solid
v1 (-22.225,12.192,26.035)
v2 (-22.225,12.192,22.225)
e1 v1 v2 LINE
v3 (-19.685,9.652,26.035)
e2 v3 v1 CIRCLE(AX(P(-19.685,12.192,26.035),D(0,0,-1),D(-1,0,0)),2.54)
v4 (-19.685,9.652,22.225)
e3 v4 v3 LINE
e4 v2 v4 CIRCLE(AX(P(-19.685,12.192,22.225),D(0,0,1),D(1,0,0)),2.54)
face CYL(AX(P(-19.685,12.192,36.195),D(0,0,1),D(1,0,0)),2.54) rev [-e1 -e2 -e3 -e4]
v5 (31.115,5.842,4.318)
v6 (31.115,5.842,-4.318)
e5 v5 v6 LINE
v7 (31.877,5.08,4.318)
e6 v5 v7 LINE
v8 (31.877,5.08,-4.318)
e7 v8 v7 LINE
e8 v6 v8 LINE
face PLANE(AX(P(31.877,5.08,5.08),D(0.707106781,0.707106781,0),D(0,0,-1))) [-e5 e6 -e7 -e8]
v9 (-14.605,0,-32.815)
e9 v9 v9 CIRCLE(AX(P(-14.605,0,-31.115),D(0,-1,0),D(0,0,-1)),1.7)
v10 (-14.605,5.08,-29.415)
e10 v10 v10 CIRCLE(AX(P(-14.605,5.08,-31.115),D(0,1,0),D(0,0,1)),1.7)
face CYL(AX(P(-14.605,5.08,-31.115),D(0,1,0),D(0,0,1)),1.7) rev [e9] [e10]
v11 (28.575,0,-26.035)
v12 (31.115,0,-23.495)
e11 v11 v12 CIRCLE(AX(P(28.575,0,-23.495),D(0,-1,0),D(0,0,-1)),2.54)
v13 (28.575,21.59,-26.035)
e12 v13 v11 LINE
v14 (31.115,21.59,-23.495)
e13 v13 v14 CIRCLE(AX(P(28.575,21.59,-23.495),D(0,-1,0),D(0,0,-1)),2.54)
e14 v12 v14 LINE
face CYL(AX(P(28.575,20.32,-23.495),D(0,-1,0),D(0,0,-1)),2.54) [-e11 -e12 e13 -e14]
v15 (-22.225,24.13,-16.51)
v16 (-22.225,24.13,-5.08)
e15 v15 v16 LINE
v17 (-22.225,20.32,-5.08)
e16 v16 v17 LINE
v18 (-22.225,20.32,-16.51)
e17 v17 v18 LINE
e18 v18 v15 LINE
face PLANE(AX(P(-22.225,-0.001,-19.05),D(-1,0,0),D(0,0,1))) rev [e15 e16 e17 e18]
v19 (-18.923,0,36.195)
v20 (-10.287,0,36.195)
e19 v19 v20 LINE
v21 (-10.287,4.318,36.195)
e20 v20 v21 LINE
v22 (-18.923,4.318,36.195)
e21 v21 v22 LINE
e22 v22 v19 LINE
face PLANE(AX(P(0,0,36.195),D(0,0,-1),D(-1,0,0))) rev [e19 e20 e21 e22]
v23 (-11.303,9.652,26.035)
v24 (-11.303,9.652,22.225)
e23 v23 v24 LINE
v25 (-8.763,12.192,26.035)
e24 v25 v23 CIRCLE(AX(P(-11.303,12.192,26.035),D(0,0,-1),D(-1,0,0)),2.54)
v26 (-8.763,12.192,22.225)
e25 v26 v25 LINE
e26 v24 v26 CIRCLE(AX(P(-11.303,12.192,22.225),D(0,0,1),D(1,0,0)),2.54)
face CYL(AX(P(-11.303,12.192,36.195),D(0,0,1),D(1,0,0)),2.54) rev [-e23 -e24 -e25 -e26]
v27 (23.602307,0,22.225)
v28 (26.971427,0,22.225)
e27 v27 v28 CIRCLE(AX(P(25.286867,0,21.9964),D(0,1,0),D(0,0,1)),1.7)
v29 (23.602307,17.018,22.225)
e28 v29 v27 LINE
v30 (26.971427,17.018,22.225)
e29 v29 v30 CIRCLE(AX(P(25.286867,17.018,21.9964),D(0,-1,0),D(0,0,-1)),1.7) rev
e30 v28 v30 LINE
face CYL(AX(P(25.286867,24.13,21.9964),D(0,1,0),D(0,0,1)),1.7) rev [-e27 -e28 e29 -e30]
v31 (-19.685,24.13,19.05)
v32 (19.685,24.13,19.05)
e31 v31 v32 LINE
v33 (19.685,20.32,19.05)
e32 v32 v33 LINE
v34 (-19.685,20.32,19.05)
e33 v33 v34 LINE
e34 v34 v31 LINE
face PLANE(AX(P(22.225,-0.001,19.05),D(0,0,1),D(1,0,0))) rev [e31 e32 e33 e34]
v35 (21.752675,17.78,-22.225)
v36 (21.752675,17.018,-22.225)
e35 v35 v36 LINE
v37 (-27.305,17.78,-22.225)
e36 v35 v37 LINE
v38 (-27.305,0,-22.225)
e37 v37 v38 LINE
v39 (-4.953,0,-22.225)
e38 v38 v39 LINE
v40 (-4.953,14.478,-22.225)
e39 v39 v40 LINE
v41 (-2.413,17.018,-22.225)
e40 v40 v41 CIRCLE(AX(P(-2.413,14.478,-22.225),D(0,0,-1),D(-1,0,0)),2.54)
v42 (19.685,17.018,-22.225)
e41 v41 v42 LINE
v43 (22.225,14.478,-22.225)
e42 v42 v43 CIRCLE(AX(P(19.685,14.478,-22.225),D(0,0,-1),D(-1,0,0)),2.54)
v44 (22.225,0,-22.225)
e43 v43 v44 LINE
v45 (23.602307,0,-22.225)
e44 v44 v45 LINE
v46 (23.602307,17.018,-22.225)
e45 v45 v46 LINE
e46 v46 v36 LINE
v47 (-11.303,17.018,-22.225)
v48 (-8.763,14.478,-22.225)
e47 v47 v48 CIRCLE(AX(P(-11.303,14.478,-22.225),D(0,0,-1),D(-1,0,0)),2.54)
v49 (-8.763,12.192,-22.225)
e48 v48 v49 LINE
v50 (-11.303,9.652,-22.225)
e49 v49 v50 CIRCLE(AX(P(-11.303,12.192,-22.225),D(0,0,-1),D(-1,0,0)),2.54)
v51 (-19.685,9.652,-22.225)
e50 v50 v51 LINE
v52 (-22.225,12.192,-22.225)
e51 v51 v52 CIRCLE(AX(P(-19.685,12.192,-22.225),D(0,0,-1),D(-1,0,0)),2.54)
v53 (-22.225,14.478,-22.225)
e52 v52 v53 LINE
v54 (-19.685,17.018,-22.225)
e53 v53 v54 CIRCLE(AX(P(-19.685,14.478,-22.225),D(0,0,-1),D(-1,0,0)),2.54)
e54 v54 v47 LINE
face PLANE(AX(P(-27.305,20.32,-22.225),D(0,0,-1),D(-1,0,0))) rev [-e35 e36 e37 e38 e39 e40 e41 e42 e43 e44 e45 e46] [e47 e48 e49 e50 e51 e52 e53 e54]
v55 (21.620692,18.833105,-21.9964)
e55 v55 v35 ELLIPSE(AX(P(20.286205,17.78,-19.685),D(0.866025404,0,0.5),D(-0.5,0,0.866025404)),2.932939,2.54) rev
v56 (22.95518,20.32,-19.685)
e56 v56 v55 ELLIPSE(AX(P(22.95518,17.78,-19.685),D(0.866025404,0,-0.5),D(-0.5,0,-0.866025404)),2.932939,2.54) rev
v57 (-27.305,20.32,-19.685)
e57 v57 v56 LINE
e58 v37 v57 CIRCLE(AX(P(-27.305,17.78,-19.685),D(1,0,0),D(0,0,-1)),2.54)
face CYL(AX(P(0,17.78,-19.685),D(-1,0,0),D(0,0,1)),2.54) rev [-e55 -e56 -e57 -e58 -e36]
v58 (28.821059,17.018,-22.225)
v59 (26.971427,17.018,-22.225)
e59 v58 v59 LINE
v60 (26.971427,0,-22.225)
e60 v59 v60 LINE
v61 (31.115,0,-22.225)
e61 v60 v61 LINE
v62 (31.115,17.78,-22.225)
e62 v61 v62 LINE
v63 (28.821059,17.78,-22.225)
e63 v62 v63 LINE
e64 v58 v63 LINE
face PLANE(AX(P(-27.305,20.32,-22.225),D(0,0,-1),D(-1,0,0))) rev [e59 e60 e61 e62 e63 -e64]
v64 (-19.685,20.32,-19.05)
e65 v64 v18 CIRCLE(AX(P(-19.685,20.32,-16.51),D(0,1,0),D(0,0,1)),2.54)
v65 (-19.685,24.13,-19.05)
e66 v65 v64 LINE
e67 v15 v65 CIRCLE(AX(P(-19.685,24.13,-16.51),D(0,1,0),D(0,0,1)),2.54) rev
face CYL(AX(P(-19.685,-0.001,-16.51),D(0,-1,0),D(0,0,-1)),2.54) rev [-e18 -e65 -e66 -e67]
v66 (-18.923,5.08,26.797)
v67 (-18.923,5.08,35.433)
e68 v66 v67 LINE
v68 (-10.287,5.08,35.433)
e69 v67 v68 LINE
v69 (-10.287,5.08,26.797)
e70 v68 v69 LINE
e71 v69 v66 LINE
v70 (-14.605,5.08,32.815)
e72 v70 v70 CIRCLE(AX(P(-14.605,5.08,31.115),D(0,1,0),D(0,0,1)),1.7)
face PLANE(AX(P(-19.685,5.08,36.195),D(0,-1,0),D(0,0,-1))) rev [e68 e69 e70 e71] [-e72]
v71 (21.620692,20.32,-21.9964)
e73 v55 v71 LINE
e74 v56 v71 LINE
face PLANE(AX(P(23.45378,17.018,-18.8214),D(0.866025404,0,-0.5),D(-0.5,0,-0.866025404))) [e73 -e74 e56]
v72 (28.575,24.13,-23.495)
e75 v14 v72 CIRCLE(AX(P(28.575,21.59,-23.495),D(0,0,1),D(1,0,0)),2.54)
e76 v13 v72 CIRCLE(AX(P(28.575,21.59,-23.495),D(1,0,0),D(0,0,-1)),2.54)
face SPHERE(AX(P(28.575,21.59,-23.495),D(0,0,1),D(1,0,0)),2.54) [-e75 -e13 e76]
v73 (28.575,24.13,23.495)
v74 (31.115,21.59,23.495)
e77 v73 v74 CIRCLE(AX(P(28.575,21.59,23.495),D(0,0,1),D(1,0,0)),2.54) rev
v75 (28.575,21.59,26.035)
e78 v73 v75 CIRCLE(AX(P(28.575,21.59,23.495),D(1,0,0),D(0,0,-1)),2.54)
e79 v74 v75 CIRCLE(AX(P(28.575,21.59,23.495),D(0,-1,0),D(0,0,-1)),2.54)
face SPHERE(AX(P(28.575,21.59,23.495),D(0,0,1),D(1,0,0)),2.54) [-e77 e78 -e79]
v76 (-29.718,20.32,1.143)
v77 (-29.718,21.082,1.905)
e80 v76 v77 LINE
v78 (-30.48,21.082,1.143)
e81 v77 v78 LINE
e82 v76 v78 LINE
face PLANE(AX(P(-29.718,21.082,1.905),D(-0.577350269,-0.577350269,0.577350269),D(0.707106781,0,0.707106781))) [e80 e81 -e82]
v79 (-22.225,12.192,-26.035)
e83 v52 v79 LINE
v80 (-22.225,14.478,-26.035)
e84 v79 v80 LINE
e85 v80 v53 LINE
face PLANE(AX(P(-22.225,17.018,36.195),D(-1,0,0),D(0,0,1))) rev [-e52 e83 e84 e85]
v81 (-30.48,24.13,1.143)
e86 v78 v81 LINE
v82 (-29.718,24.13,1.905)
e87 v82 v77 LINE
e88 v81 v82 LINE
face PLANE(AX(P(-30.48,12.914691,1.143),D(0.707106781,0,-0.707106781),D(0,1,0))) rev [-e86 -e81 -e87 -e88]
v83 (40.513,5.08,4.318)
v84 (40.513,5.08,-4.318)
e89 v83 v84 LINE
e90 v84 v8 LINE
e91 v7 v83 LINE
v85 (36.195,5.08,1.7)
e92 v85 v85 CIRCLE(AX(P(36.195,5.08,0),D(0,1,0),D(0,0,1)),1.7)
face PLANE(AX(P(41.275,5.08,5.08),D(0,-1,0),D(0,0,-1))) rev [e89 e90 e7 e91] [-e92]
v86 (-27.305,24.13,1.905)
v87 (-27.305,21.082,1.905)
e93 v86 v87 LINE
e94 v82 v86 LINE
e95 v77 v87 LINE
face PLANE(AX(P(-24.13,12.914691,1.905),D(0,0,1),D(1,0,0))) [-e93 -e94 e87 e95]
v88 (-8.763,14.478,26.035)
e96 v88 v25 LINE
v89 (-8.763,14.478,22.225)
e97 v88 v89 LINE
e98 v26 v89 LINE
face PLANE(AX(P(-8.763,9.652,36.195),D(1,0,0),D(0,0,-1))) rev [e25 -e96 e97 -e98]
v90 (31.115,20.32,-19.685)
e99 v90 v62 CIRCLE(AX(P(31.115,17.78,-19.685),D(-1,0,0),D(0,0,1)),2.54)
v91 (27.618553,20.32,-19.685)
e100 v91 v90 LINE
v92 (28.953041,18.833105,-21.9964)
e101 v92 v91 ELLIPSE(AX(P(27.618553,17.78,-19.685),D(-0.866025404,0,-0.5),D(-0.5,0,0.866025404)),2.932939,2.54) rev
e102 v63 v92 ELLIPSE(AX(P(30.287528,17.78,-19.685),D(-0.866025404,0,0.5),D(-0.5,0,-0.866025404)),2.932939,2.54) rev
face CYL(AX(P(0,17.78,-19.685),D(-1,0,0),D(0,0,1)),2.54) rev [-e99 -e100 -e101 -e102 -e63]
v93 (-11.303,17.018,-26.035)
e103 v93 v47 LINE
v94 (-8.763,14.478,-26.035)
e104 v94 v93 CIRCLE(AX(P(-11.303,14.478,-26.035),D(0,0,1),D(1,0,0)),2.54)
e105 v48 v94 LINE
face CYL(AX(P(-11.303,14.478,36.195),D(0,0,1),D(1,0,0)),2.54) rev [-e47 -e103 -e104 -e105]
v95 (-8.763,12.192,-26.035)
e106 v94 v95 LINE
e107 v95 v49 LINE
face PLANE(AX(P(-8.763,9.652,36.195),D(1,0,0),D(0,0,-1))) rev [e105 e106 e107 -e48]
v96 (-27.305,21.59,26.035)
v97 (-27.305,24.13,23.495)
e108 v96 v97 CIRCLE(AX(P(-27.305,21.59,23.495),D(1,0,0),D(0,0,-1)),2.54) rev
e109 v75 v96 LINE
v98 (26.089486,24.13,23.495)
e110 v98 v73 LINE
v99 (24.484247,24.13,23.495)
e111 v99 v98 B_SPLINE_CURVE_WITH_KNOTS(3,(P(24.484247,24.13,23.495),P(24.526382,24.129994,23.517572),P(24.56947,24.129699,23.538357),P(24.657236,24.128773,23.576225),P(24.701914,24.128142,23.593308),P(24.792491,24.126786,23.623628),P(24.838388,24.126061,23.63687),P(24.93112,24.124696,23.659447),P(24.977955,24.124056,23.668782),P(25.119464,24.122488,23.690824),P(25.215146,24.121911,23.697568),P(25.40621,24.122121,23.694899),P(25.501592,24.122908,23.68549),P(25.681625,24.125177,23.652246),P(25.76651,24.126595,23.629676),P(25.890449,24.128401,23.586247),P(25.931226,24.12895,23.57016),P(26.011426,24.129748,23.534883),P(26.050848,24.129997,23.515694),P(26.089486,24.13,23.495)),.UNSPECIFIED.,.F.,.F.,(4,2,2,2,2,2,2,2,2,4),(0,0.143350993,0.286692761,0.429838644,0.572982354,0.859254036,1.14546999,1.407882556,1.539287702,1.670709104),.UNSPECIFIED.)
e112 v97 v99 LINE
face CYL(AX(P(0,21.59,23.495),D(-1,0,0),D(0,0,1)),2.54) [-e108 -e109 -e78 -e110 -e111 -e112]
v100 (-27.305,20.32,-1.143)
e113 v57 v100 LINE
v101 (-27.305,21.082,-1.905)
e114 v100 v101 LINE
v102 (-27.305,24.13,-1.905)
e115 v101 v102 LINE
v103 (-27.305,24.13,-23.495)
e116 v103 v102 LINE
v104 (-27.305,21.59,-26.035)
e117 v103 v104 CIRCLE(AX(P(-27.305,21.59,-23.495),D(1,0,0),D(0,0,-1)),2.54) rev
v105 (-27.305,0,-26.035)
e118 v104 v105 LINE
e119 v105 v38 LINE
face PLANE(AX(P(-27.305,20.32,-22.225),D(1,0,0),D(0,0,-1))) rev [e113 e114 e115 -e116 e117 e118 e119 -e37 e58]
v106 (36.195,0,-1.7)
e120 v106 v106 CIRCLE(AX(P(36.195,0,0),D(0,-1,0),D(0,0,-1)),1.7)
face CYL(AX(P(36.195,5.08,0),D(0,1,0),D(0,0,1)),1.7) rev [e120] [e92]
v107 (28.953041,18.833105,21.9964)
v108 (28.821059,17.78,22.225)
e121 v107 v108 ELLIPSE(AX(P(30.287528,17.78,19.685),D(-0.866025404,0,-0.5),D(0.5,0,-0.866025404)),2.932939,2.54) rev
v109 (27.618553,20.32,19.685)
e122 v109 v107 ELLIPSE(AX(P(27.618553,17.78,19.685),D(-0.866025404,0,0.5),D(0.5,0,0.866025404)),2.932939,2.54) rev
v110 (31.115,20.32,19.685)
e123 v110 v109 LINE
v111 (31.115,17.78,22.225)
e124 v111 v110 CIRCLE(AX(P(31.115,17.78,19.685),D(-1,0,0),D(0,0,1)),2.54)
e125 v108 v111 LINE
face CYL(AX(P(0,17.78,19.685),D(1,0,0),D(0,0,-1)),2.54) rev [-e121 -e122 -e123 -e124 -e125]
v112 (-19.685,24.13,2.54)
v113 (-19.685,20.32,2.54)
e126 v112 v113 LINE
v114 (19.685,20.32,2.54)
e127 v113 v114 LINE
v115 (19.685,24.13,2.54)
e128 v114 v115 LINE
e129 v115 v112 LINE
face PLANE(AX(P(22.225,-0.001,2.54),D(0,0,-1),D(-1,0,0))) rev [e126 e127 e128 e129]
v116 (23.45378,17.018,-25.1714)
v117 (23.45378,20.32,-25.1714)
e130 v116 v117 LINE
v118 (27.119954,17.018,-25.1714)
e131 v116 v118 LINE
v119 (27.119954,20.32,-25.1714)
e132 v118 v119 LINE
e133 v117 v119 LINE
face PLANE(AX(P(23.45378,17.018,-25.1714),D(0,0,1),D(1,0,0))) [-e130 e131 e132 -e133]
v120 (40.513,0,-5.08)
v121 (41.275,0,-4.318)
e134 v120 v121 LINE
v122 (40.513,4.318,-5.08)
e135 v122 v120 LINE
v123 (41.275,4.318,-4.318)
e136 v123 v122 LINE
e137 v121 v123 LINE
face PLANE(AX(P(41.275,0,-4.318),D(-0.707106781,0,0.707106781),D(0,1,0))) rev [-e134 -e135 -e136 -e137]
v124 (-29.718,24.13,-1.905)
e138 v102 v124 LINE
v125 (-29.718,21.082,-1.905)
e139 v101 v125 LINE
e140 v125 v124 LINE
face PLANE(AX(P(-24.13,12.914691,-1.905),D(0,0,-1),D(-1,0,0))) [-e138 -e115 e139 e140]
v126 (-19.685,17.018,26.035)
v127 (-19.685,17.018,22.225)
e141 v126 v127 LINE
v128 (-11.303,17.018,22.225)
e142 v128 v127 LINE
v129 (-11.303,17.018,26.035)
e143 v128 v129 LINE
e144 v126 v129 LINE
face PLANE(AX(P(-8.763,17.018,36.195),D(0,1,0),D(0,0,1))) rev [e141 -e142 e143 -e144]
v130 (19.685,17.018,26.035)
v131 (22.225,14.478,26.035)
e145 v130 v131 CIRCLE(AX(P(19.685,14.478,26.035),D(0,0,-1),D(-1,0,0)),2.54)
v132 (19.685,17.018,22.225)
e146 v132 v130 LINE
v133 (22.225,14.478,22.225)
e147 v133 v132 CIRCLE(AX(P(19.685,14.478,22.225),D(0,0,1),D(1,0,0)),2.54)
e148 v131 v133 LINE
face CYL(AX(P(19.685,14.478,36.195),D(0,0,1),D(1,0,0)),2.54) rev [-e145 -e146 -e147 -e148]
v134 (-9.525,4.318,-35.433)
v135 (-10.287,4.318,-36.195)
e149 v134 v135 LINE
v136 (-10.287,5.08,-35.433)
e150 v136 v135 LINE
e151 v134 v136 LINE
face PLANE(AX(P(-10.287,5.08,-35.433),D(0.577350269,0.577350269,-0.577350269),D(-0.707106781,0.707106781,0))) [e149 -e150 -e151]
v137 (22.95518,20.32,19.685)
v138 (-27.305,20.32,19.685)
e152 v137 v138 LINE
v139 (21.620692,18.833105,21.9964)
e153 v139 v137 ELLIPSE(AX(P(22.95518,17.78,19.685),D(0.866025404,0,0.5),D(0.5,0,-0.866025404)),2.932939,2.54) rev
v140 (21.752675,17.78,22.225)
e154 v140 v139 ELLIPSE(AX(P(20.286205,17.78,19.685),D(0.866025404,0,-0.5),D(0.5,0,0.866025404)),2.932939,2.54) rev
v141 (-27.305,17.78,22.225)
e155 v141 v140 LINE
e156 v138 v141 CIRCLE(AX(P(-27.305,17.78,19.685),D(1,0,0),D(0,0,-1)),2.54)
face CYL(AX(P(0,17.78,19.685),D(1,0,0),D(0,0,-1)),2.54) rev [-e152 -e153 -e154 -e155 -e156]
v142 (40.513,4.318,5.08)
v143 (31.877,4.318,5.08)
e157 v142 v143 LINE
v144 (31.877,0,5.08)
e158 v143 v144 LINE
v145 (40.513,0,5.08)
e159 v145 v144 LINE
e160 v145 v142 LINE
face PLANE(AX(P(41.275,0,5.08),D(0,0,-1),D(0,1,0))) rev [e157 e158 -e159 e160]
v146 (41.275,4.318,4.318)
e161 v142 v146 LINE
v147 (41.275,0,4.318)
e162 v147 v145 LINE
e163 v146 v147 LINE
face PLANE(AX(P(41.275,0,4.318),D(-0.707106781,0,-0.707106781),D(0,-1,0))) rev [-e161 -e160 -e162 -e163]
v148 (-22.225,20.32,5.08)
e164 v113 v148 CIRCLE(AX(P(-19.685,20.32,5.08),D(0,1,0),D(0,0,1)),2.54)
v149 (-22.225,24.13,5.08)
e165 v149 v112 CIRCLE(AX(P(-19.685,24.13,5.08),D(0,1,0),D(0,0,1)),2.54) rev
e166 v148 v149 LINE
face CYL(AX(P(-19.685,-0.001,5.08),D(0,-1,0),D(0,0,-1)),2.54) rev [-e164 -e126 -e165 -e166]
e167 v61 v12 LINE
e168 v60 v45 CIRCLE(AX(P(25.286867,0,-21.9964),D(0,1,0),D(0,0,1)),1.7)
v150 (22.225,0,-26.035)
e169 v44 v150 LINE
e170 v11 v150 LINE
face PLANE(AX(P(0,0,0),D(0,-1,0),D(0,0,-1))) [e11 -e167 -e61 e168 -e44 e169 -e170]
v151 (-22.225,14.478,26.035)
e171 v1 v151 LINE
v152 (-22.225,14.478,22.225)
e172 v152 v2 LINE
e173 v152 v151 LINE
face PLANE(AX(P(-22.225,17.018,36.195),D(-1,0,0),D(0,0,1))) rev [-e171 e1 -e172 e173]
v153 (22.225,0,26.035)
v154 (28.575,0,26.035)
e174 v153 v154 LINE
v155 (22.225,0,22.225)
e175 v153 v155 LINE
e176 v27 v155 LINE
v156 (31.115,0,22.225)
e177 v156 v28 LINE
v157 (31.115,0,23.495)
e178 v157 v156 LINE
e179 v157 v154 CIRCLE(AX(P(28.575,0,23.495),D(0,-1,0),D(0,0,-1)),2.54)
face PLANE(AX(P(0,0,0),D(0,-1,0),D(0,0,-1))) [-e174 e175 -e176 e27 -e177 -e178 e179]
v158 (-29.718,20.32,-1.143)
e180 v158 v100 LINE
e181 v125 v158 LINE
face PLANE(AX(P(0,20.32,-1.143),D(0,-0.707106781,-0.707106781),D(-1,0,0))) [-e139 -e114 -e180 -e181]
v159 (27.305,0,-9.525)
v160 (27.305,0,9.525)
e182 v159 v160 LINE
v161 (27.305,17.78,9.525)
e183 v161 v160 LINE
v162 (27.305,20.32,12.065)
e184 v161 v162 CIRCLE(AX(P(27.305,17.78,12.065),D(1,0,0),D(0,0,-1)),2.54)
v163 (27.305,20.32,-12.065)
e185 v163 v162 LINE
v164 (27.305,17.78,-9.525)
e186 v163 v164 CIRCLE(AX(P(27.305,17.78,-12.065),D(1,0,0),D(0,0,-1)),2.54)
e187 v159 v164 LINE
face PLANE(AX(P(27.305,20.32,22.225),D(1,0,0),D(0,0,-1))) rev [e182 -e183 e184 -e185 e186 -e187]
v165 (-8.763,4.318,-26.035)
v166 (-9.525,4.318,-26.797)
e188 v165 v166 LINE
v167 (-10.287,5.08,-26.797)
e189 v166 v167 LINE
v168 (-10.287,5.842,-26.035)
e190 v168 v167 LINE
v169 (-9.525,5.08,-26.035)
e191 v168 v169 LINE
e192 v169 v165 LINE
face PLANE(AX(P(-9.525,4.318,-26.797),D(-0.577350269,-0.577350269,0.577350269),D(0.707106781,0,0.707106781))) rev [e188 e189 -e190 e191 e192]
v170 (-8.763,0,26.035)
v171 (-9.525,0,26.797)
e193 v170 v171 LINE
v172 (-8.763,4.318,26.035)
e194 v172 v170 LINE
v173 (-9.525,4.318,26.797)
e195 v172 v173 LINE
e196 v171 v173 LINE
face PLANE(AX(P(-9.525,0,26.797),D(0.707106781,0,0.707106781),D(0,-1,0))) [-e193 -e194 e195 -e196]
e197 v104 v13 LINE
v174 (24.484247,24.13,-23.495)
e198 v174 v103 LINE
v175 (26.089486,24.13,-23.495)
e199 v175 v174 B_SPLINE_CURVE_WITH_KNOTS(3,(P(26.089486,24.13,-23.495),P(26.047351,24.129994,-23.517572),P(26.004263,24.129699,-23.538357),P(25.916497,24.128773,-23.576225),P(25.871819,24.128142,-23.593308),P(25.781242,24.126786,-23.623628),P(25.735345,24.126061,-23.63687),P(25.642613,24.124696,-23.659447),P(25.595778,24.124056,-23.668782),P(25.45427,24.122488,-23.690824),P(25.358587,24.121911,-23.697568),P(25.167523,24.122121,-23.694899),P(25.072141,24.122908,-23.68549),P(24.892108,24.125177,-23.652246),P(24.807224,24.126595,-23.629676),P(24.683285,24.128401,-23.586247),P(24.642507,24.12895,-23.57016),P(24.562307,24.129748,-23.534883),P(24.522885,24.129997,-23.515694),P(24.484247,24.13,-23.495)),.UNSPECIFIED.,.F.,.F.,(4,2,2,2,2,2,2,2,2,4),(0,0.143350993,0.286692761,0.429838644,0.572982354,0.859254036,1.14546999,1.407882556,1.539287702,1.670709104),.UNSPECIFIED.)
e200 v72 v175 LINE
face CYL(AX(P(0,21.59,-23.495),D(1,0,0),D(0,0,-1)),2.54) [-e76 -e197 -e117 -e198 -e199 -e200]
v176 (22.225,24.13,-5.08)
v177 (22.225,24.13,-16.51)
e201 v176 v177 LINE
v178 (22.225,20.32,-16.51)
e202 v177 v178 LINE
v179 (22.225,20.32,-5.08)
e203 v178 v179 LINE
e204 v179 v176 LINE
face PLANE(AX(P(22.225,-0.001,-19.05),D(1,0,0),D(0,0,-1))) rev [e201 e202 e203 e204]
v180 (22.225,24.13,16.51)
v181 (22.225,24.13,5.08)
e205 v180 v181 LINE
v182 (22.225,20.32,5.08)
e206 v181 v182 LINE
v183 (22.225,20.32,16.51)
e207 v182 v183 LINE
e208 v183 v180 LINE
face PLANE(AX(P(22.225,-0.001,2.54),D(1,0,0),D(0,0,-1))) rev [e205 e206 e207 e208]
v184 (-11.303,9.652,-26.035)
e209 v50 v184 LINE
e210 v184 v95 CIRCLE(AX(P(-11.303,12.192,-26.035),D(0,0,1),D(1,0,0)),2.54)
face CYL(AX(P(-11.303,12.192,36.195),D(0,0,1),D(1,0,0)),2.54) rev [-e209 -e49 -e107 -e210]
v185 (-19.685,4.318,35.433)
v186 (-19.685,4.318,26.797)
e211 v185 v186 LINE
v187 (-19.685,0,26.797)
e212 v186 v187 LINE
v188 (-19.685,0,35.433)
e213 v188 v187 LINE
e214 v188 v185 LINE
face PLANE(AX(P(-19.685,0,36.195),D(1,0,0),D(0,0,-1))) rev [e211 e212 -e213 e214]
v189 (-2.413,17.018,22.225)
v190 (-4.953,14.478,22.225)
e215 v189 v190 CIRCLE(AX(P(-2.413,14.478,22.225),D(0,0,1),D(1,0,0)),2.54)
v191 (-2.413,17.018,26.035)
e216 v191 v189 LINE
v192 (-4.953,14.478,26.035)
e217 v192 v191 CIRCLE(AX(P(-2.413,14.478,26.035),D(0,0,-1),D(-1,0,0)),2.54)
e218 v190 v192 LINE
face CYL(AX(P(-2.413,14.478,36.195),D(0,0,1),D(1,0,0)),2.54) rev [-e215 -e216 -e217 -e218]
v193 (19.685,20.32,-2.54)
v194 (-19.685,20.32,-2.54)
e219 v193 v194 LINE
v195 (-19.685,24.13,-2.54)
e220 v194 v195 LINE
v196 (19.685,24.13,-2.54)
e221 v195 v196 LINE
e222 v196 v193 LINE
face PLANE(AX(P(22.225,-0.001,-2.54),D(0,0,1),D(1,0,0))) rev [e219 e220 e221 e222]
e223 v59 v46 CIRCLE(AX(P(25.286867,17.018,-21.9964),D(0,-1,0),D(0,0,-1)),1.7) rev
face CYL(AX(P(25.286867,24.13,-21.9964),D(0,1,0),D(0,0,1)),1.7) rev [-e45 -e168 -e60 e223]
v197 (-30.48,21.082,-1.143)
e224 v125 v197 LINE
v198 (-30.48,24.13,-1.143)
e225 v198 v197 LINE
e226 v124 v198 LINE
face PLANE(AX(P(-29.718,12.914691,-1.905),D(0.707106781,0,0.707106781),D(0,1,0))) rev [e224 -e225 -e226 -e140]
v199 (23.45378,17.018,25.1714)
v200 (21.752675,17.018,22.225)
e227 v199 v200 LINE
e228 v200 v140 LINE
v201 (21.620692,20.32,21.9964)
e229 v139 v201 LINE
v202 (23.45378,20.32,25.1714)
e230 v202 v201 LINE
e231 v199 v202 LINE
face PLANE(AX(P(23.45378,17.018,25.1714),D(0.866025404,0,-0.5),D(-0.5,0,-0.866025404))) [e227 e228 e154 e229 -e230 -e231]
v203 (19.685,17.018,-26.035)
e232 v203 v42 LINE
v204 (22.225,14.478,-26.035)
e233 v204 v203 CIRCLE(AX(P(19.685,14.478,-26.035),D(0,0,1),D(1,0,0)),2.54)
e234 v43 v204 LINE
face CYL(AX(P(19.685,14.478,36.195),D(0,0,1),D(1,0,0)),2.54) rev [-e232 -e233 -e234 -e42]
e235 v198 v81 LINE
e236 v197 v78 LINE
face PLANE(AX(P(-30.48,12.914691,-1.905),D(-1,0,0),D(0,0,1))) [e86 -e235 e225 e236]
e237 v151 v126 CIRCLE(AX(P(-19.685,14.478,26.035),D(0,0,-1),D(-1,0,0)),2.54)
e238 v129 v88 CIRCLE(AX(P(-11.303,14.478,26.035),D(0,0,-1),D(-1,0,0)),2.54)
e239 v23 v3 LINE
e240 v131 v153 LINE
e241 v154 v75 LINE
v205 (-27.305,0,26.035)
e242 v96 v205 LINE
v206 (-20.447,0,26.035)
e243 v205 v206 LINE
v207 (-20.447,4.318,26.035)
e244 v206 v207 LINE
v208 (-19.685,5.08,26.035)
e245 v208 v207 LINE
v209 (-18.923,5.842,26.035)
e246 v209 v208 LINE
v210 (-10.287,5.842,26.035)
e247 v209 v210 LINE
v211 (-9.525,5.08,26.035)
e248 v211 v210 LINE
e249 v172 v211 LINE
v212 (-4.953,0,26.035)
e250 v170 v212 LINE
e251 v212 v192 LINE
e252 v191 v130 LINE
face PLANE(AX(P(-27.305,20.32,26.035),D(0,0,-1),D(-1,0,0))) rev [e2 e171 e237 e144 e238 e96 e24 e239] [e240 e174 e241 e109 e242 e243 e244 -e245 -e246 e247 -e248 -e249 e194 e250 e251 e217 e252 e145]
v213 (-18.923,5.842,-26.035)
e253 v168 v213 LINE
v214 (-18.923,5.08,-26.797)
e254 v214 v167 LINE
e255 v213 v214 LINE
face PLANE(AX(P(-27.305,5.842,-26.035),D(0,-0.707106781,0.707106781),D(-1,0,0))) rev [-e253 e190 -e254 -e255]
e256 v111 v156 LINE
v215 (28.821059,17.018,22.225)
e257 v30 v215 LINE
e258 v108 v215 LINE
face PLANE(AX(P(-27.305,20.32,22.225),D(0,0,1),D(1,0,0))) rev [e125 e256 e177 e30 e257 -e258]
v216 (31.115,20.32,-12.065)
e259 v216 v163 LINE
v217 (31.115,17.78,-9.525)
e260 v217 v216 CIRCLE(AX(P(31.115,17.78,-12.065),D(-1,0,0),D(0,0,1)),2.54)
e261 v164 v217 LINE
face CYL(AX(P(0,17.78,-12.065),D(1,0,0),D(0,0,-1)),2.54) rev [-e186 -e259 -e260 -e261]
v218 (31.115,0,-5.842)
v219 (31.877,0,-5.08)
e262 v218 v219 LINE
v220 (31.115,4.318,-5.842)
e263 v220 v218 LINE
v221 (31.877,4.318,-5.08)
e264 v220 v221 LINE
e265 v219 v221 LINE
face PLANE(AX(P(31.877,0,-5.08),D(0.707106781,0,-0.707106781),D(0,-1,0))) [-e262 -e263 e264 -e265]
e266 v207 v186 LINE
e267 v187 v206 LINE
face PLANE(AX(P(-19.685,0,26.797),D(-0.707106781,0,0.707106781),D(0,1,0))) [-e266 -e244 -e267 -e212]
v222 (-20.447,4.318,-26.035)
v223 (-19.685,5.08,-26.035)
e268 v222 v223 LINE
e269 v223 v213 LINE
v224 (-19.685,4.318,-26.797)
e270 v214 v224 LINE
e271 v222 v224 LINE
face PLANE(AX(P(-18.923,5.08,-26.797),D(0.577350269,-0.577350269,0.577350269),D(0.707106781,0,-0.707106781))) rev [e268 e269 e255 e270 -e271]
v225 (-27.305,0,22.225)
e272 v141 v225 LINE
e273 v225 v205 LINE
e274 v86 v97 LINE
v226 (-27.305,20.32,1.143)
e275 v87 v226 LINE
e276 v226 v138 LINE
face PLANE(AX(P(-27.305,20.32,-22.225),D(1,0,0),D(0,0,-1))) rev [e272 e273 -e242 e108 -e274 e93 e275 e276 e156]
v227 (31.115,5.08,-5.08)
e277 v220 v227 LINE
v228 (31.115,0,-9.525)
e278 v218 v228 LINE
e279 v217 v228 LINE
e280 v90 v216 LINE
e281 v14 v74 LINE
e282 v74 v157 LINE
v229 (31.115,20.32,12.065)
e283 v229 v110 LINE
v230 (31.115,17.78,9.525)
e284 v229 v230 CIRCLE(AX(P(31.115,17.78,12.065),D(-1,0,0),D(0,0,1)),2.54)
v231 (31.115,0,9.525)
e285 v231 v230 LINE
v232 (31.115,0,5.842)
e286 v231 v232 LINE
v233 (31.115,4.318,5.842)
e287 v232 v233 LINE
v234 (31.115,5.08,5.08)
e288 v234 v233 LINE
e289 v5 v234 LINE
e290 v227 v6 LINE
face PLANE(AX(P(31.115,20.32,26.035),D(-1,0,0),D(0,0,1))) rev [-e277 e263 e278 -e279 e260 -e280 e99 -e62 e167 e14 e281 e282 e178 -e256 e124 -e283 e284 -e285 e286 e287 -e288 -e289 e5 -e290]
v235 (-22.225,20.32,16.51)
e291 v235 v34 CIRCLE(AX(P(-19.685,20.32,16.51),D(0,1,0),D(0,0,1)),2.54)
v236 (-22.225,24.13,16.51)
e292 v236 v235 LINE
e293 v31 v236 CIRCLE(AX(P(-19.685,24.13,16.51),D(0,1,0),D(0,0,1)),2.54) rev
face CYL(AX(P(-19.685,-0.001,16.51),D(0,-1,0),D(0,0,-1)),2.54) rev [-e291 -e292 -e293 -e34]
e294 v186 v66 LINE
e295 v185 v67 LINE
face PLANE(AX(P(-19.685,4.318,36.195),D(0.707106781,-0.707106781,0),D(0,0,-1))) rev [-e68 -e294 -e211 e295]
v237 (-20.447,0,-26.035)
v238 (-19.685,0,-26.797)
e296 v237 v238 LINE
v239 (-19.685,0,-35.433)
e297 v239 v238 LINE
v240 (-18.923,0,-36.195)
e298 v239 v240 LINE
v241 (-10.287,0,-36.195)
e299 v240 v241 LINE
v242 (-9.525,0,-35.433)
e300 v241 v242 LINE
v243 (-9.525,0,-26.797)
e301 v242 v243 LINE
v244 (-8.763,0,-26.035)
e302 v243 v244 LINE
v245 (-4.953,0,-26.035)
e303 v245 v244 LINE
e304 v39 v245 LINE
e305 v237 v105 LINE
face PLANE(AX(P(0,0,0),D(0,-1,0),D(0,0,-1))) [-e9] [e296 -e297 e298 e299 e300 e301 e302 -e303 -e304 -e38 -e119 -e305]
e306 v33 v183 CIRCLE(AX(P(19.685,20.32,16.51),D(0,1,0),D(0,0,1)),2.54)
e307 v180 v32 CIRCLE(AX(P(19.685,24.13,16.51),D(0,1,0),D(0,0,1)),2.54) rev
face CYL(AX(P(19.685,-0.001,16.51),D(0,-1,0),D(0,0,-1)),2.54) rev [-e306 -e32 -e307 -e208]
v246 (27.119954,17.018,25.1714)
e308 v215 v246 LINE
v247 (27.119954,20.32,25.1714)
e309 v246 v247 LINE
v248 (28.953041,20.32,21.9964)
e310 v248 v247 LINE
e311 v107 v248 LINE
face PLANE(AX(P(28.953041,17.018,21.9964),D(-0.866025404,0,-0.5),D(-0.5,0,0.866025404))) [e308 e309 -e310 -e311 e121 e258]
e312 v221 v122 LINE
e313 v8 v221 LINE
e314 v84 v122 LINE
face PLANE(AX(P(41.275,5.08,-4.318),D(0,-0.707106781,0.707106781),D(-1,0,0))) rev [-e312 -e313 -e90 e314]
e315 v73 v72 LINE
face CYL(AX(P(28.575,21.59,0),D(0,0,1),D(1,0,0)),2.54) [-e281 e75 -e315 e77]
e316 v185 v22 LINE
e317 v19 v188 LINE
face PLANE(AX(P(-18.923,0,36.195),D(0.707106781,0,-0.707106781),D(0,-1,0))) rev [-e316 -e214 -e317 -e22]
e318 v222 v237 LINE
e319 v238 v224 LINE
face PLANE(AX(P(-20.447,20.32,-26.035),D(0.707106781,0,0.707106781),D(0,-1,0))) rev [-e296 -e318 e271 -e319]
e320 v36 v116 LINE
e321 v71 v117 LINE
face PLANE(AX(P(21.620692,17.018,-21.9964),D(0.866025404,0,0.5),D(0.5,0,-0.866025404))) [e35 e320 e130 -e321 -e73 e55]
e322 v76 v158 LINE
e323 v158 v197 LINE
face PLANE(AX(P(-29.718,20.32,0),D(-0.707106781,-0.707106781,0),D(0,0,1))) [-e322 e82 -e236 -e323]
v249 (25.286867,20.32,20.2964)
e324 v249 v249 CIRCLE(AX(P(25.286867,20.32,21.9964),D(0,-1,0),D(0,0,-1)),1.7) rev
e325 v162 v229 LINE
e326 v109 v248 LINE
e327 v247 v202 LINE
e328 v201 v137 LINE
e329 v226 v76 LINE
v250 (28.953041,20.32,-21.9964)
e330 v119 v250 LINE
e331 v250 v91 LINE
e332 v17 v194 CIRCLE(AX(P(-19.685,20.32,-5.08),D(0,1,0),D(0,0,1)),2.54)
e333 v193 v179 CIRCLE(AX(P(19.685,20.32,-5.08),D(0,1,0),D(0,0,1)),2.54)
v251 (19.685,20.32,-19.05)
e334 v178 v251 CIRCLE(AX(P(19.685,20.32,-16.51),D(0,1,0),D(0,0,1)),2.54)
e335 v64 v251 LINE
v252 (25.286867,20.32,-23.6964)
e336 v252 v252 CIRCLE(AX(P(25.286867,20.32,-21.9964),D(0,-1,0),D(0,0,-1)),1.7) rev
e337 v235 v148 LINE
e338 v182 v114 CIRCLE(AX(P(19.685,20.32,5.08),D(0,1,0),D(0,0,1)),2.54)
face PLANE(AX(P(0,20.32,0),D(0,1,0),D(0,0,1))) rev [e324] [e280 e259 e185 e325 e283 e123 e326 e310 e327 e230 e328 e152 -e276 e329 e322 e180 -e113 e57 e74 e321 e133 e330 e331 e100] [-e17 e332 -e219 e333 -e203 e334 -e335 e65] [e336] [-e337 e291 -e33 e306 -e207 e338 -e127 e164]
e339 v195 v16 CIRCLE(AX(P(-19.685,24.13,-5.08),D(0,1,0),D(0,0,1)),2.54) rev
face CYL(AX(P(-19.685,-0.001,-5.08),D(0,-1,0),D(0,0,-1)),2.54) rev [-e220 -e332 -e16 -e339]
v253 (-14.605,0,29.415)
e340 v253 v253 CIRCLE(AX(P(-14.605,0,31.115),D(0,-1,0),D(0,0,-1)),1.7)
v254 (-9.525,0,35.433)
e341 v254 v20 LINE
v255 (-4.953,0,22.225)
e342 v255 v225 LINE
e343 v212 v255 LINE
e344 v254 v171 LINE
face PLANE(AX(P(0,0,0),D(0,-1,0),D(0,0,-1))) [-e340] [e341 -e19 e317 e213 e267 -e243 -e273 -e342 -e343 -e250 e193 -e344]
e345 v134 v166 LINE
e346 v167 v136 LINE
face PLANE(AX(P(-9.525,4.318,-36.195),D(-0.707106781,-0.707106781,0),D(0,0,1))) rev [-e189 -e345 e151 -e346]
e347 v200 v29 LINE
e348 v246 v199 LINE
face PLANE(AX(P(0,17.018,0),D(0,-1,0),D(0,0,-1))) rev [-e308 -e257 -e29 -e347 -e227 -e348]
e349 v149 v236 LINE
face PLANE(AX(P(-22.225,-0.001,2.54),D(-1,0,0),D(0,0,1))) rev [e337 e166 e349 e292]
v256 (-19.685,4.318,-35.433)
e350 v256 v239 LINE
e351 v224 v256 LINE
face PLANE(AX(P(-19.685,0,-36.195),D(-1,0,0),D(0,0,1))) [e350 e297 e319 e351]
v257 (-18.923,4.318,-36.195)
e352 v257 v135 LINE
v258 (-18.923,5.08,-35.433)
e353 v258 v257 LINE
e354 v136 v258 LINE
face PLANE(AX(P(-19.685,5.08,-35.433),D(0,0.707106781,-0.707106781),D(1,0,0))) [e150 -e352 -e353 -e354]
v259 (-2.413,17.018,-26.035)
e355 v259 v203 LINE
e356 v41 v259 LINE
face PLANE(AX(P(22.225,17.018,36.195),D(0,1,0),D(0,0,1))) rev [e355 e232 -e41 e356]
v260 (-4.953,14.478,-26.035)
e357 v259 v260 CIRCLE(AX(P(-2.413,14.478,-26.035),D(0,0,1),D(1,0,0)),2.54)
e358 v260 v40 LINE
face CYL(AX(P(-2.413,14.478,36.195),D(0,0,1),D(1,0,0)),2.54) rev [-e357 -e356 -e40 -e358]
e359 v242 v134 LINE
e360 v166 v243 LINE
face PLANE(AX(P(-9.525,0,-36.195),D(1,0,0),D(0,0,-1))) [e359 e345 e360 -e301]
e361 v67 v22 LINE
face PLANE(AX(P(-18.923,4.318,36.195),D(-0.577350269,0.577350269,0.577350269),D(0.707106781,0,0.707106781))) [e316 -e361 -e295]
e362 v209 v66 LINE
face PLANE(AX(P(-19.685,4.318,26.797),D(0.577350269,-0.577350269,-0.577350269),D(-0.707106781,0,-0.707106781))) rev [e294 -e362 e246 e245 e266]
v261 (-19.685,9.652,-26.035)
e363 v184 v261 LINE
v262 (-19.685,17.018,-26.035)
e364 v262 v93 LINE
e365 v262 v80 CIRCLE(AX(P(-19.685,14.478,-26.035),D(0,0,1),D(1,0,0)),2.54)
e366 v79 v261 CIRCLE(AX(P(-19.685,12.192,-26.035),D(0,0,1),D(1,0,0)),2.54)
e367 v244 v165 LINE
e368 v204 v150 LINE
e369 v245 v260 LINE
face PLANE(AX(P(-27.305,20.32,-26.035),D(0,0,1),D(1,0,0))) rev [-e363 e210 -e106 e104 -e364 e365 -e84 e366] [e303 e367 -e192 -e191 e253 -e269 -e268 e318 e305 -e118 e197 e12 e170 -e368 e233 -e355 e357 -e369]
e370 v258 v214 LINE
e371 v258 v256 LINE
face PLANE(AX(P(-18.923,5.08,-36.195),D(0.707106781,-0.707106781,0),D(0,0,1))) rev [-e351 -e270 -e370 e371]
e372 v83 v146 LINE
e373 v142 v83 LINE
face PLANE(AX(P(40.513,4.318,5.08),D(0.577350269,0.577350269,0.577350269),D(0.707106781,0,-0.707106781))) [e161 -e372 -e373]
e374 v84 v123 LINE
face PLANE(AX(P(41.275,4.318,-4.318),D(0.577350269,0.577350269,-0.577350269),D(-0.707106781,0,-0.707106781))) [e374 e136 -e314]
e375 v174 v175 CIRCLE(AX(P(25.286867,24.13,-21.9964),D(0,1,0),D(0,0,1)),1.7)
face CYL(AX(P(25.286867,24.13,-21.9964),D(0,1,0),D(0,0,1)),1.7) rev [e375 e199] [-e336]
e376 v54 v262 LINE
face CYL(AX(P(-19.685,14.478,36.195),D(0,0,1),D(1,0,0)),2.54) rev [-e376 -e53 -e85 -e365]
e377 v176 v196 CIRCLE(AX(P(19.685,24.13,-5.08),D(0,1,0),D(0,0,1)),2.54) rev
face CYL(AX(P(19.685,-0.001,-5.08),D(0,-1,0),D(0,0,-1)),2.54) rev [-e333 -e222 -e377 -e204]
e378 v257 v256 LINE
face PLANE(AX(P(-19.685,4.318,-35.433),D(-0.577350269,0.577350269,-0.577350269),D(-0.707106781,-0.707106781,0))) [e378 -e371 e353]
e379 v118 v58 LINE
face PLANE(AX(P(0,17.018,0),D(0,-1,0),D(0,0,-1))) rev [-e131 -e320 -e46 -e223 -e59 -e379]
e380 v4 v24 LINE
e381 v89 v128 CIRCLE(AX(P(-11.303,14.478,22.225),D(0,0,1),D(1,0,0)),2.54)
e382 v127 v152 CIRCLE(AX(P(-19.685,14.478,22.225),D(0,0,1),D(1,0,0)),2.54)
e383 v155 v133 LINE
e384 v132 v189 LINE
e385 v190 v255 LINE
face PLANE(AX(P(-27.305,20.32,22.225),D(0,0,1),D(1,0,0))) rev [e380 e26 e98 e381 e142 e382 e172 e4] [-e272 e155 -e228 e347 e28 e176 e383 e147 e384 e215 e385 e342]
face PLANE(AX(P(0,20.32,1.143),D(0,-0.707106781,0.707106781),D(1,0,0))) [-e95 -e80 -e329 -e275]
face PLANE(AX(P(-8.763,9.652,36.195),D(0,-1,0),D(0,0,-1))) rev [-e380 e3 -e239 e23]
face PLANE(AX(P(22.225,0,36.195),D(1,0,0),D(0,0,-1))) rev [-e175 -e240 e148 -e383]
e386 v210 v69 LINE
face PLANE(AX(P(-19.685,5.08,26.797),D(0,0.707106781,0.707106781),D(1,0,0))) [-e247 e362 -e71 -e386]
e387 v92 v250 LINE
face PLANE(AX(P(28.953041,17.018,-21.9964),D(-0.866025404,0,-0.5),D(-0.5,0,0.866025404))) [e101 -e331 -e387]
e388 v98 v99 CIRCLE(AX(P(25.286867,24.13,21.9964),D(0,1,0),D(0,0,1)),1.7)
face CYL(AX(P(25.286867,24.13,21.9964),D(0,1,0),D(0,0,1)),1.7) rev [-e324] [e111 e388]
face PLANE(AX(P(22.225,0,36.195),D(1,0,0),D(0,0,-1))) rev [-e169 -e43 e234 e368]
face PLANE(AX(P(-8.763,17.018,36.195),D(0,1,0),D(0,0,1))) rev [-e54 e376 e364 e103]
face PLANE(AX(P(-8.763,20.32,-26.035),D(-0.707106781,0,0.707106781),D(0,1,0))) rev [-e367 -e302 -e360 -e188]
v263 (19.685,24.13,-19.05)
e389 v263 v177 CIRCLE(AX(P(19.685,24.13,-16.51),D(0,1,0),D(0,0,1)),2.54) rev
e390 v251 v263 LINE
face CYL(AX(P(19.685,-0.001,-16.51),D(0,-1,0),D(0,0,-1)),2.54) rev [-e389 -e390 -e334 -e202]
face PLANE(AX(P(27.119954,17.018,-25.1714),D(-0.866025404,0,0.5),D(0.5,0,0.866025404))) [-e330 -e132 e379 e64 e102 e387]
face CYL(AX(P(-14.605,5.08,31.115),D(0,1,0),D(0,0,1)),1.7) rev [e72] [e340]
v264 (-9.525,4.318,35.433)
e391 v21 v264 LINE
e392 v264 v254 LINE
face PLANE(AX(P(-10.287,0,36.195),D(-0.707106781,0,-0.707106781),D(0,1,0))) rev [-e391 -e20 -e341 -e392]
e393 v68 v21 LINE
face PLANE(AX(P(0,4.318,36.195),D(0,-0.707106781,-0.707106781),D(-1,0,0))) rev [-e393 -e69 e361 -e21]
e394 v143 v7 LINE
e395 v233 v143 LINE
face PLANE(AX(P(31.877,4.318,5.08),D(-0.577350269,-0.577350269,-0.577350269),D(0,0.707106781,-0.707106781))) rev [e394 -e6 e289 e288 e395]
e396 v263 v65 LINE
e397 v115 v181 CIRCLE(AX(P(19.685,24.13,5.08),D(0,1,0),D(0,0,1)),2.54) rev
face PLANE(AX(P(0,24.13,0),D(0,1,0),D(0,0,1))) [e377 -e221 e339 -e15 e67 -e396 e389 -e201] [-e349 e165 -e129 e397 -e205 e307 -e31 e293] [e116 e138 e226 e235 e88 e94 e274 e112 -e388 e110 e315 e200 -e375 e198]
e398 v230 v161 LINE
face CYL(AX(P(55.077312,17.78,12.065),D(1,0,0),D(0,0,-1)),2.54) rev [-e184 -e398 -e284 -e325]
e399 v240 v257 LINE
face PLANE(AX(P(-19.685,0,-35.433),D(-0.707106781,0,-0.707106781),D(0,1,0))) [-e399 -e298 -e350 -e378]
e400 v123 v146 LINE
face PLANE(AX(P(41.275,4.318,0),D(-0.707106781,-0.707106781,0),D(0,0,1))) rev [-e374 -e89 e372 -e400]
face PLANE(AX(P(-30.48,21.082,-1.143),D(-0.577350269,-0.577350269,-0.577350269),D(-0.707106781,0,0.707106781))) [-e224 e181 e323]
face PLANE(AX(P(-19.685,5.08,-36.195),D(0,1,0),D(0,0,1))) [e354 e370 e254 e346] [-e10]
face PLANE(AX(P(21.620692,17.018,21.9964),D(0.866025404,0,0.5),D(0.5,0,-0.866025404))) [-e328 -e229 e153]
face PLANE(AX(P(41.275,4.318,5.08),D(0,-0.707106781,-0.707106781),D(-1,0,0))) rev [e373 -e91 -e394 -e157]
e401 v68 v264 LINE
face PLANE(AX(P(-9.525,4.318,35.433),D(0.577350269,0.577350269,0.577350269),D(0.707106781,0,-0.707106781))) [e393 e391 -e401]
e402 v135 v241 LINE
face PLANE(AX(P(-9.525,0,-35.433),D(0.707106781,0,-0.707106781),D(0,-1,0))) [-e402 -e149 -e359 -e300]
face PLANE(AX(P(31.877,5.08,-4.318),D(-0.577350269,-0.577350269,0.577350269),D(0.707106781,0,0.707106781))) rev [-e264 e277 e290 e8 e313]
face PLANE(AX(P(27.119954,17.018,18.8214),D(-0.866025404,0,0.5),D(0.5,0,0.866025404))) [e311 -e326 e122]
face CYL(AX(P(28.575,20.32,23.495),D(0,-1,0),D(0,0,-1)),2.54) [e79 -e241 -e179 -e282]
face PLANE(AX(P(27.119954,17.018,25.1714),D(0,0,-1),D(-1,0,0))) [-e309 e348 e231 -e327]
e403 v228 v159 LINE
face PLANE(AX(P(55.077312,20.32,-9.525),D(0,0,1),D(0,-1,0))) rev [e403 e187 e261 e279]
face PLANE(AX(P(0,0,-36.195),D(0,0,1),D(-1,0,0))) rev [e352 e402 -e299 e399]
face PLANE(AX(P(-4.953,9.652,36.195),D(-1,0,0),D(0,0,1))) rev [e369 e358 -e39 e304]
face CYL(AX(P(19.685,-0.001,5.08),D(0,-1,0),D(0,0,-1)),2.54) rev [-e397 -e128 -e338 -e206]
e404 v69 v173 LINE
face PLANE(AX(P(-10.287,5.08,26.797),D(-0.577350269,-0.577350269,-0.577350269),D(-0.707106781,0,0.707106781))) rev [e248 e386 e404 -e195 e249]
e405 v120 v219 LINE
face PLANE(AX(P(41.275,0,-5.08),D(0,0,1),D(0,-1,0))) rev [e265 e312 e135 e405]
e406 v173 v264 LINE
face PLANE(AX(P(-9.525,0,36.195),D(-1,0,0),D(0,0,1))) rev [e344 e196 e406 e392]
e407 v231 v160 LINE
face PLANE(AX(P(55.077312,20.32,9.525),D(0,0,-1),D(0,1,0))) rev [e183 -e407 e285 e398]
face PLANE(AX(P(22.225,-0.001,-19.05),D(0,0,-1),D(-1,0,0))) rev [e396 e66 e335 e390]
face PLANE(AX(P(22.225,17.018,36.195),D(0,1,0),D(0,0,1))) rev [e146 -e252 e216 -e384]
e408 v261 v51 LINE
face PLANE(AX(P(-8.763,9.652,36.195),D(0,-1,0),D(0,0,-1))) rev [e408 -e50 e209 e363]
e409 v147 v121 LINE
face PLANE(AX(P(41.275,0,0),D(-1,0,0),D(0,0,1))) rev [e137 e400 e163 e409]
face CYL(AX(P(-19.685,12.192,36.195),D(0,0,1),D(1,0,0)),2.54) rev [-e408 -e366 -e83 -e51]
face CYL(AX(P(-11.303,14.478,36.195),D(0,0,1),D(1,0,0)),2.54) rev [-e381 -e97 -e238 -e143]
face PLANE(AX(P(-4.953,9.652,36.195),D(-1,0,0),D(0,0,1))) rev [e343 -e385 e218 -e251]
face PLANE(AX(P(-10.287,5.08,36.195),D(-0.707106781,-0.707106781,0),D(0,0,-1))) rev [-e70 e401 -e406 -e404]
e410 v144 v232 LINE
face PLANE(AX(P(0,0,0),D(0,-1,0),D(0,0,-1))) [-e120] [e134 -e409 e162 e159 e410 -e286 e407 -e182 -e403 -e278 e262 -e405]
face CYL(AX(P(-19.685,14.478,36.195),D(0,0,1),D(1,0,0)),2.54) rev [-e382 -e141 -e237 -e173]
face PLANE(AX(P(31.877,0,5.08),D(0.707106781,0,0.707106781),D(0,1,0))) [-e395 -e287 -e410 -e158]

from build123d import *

# Parameters (mm, degrees)
BOSS_EXTRUDE1_DEPTH      = 20.32
SKETCH2_W                = 58.42
SKETCH2_H                = 52.07
BOSS_EXTRUDE2_DEPTH      = 3.81
SKETCH3_W                = 12.7
SKETCH3_H                = 20.32
CUT_EXTRUDE1_DEPTH       = 3.81
FILLET2_R                = 2.54
SKETCH4_W                = 10.16
SKETCH4_H                = 5.08
BOSS_EXTRUDE3_DEPTH      = 10.16
CHAMFER1_SIZE            = 0.762
SKETCH5_W                = 10.16
SKETCH5_H                = 5.08
BOSS_EXTRUDE4_DEPTH      = 10.16
CHAMFER2_SIZE            = 0.762
CHAMFER2_OF_MIRROR1_SIZE = 0.762
M3_CLEARANCE_HOLE1_D     = 3.4
M3_CLEARANCE_HOLE2_D     = 3.4
CUT_EXTRUDE2_REACH       = 61.966
SKETCH13_W               = 44.45
SKETCH13_H               = 16.51
SKETCH15_W               = 13.462
SKETCH15_H               = 7.366
CUT_EXTRUDE4_DEPTH       = 79.475827011
FILLET3_R                = 2.54
SKETCH16_W               = 6.35
SKETCH16_H               = 3.81
BOSS_EXTRUDE5_DEPTH      = 3.81
CHAMFER3_SIZE            = 0.762
M3_CLEARANCE_HOLE4_D     = 3.4
CUT_EXTRUDE5_DEPTH       = 3.302
FILLET4_R                = 2.54


with BuildPart() as part:
    # Sketch1 → Boss-Extrude1 (new body)
    with BuildSketch(Plane(origin=(0, 0, 0), x_dir=(1, 0, 0), z_dir=(0, 1, 0))):
        Polygon((-27.305, 22.225), (-27.305, 26.035), (31.115, 26.035), (31.115, -26.035), (-27.305, -26.035), (-27.305, -22.225), (27.305, -22.225), (27.305, 22.225), align=None)
    extrude(amount=BOSS_EXTRUDE1_DEPTH)

    # Sketch2 → Boss-Extrude2 (add)
    with BuildSketch(Plane(origin=(0, 20.32, 0), x_dir=(1, 0, 0), z_dir=(0, 1, 0))):
        with Locations((1.905, 0)):
            Rectangle(SKETCH2_W, SKETCH2_H)
    extrude(amount=BOSS_EXTRUDE2_DEPTH)

    # Sketch3 → Cut-Extrude1 (cut)
    with BuildSketch(Plane.ZY.offset(-27.305)):
        with Locations((-15.875, 10.16)):
            Rectangle(SKETCH3_W, SKETCH3_H)
        with Locations((15.875, 10.16)):
            Rectangle(SKETCH3_W, SKETCH3_H)
    extrude(amount=-CUT_EXTRUDE1_DEPTH, mode=Mode.SUBTRACT)

    # Fillet2
    fillet2_edges = [part.edges().sort_by_distance(p)[0] for p in [
        (31.115, 12.065, -26.035),
        (31.115, 12.065, 26.035),
        (31.115, 24.13, 0),
    ]]
    fillet(fillet2_edges, radius=FILLET2_R)

    # Sketch4 → Boss-Extrude3 (add)
    with BuildSketch(Plane(origin=(31.115, 0, 0), x_dir=(0, 0, -1), z_dir=(1, 0, 0))):
        with Locations((0, 2.54)):
            Rectangle(SKETCH4_W, SKETCH4_H)
    extrude(amount=BOSS_EXTRUDE3_DEPTH)

    # Chamfer1
    chamfer1_edges = [part.edges().sort_by_distance(p)[0] for p in [
        (31.115, 2.54, 5.08),
        (36.195, 5.08, 5.08),
        (31.115, 2.54, -5.08),
        (31.115, 5.08, 0),
        (36.195, 5.08, -5.08),
        (41.275, 2.54, 5.08),
        (41.275, 2.54, -5.08),
        (41.275, 5.08, 0),
    ]]
    chamfer(chamfer1_edges, length=CHAMFER1_SIZE)

    # Sketch5 → Boss-Extrude4 (add)
    with BuildSketch(Plane.XY.offset(26.035)):
        with Locations((-14.605, 2.54)):
            Rectangle(SKETCH5_W, SKETCH5_H)
    boss_extrude4 = extrude(amount=BOSS_EXTRUDE4_DEPTH)

    # Chamfer2
    chamfer2_edges = [part.edges().sort_by_distance(p)[0] for p in [
        (-19.685, 2.54, 26.035),
        (-19.685, 5.08, 31.115),
        (-9.525, 2.54, 26.035),
        (-14.605, 5.08, 26.035),
        (-9.525, 5.08, 31.115),
        (-19.685, 2.54, 36.195),
        (-9.525, 2.54, 36.195),
        (-14.605, 5.08, 36.195),
    ]]
    chamfer(chamfer2_edges, length=CHAMFER2_SIZE)

    # Mirror1: Boss-Extrude4 across plane
    add(boss_extrude4.mirror(Plane.XY))

    # Chamfer2 of Mirror1
    chamfer2_of_mirror1_edges = [part.edges().sort_by_distance(p)[0] for p in [
        (-19.685, 2.54, -26.035),
        (-19.685, 5.08, -31.115),
        (-9.525, 2.54, -26.035),
        (-14.605, 5.08, -26.035),
        (-9.525, 5.08, -31.115),
        (-19.685, 2.54, -36.195),
        (-9.525, 2.54, -36.195),
        (-14.605, 5.08, -36.195),
    ]]
    chamfer(chamfer2_of_mirror1_edges, length=CHAMFER2_OF_MIRROR1_SIZE)

    # M3 Clearance Hole1 (through all)
    with Locations(Plane(origin=(0, 5.08, 0), x_dir=(1, 0, 0), z_dir=(0, 1, 0))):
        with Locations((-14.605, -31.115)):
            m3_clearance_hole1 = Hole(M3_CLEARANCE_HOLE1_D / 2)

    # Mirror2: M3 Clearance Hole1 across plane
    add(m3_clearance_hole1.mirror(Plane.XY), mode=Mode.SUBTRACT)

    # M3 Clearance Hole2 (through all)
    with Locations(Plane(origin=(0, 5.08, 0), x_dir=(1, 0, 0), z_dir=(0, 1, 0))):
        with Locations((36.195, 0)):
            Hole(M3_CLEARANCE_HOLE2_D / 2)

    # Sketch13 → Cut-Extrude2 (cut, up to next)
    with BuildSketch(Plane(origin=(0, 24.13, 0), x_dir=(1, 0, 0), z_dir=(0, 1, 0)), mode=Mode.PRIVATE) as cut_extrude2_sk1:
        with Locations((0, -10.795)):
            Rectangle(SKETCH13_W, SKETCH13_H)
    cut_extrude2_tool1 = extrude(cut_extrude2_sk1.sketch, amount=-CUT_EXTRUDE2_REACH, mode=Mode.PRIVATE) & part.part
    # Sketch13 → Cut-Extrude2 (cut, up to next)
    with BuildSketch(Plane(origin=(0, 24.13, 0), x_dir=(1, 0, 0), z_dir=(0, 1, 0)), mode=Mode.PRIVATE) as cut_extrude2_sk2:
        with Locations((0, 10.795)):
            Rectangle(SKETCH13_W, SKETCH13_H)
    cut_extrude2_tool2 = extrude(cut_extrude2_sk2.sketch, amount=-CUT_EXTRUDE2_REACH, mode=Mode.PRIVATE) & part.part
    add(cut_extrude2_tool1.solids().sort_by_distance((0, 24.13, 10.795))[0], mode=Mode.SUBTRACT)
    add(cut_extrude2_tool2.solids().sort_by_distance((0, 24.13, -10.795))[0], mode=Mode.SUBTRACT)

    # Sketch15 → Cut-Extrude4 (cut, through all)
    with BuildSketch(Plane(origin=(0, 0, -26.035), x_dir=(-1, 0, 0), z_dir=(0, 0, -1))):
        Polygon((-22.225, 0), (4.953, 0), (4.953, 9.652), (4.953, 17.018), (-22.225, 17.018), align=None)
        with Locations((15.494, 13.335)):
            Rectangle(SKETCH15_W, SKETCH15_H)
    extrude(amount=-CUT_EXTRUDE4_DEPTH, mode=Mode.SUBTRACT)

    # Fillet3
    fillet3_edges = [part.edges().sort_by_distance(p)[0] for p in [
        (-22.225, 22.225, 19.05),
        (-22.225, 22.225, 2.54),
        (1.905, 20.32, -22.225),
        (22.225, 22.225, 2.54),
        (22.225, 22.225, 19.05),
        (22.225, 22.225, -19.05),
        (22.225, 22.225, -2.54),
        (-22.225, 22.225, -2.54),
        (-22.225, 22.225, -19.05),
        (22.225, 17.018, 24.13),
        (22.225, 17.018, -24.13),
        (-4.953, 17.018, 24.13),
        (-4.953, 17.018, -24.13),
        (-22.225, 17.018, 24.13),
        (-22.225, 17.018, -24.13),
        (-22.225, 9.652, 24.13),
        (-22.225, 9.652, -24.13),
        (-8.763, 9.652, 24.13),
        (-8.763, 9.652, -24.13),
        (-8.763, 17.018, 24.13),
        (-8.763, 17.018, -24.13),
        (29.21, 20.32, -9.525),
        (29.21, 20.32, 9.525),
        (1.905, 20.32, 22.225),
    ]]
    fillet(fillet3_edges, radius=FILLET3_R)

    # Sketch16 → Boss-Extrude5 (add)
    with BuildSketch(Plane(origin=(0, 24.13, 0), x_dir=(1, 0, 0), z_dir=(0, 1, 0))):
        with Locations((-27.305, 0)):
            Rectangle(SKETCH16_W, SKETCH16_H)
    extrude(amount=-BOSS_EXTRUDE5_DEPTH)

    # Chamfer3
    chamfer3_edges = [part.edges().sort_by_distance(p)[0] for p in [
        (-28.8925, 20.32, -1.905),
        (-28.8925, 20.32, 1.905),
        (-30.48, 20.32, 0),
        (-30.48, 22.225, -1.905),
        (-30.48, 22.225, 1.905),
    ]]
    chamfer(chamfer3_edges, length=CHAMFER3_SIZE)

    # M3 Clearance Hole4 (through all)
    with Locations(Plane(origin=(0, 24.13, 0), x_dir=(1, 0, 0), z_dir=(0, 1, 0))):
        with Locations((25.286866606, -21.9964), (25.286866606, 21.9964)):
            Hole(M3_CLEARANCE_HOLE4_D / 2)

    # Sketch22 → Cut-Extrude5 (cut)
    with BuildSketch(Plane.XZ.offset(-20.32)):
        Polygon((28.953040816, 21.9964), (27.119953711, 25.1714), (23.453779502, 25.1714), (21.620692397, 21.9964), (23.453779502, 18.8214), (27.119953711, 18.8214), align=None)
        Polygon((28.953040816, -21.9964), (27.119953711, -18.8214), (23.453779502, -18.8214), (21.620692397, -21.9964), (23.453779502, -25.1714), (27.119953711, -25.1714), align=None)
    extrude(amount=CUT_EXTRUDE5_DEPTH, mode=Mode.SUBTRACT)

    # Fillet4
    # the kernel refuses this fillet: 2.54 mm, written as the material it takes off along each edge
    with BuildSketch(Plane(origin=(28.575, 21.59, 23.495), x_dir=(0, 0, 1), z_dir=(0, 1, 0))) as fillet4_piece_1_section:
        Polygon((0, 0), (FILLET4_R, 0), (FILLET4_R, FILLET4_R), (0, FILLET4_R), align=None)
    fillet4_piece_1 = extrude(amount=FILLET4_R, mode=Mode.PRIVATE)
    fillet4_piece_1 = fillet4_piece_1 - Plane(origin=(28.575, 21.59, 23.495), x_dir=(-0.7071067811865475, 0, -0.7071067811865475), z_dir=(0, 1, 0)) * Sphere(FILLET4_R, mode=Mode.PRIVATE)
    add(fillet4_piece_1, mode=Mode.SUBTRACT)
    with BuildSketch(Plane(origin=(28.575, 21.59, -23.495), x_dir=(0, 0, -1), z_dir=(0, 1, 0))) as fillet4_piece_2_section:
        Polygon((0, 0), (FILLET4_R, 0), (FILLET4_R, -FILLET4_R), (0, -FILLET4_R), align=None)
    fillet4_piece_2 = extrude(amount=FILLET4_R, mode=Mode.PRIVATE)
    fillet4_piece_2 = fillet4_piece_2 - Plane(origin=(28.575, 21.59, -23.495), x_dir=(-0.7071067811865475, 0, 0.7071067811865475), z_dir=(0, 1, 0)) * Sphere(FILLET4_R, mode=Mode.PRIVATE)
    add(fillet4_piece_2, mode=Mode.SUBTRACT)
    with BuildSketch(Plane(origin=(28.575, 24.13, 26.035), x_dir=(0, 0, -1), z_dir=(-1, 0, 0)), Plane(origin=(-33.655, 24.13, -26.035), x_dir=(0, 0, 1), z_dir=(1, 0, 0))) as fillet4_piece_3:
        with BuildLine():
            CenterArc((FILLET4_R, FILLET4_R), FILLET4_R, 180, 90)
            Line((0, FILLET4_R), (0, 0))
            Line((0, 0), (FILLET4_R, 0))
        make_face()
    extrude(amount=62.23, mode=Mode.SUBTRACT)


solid = part.part
